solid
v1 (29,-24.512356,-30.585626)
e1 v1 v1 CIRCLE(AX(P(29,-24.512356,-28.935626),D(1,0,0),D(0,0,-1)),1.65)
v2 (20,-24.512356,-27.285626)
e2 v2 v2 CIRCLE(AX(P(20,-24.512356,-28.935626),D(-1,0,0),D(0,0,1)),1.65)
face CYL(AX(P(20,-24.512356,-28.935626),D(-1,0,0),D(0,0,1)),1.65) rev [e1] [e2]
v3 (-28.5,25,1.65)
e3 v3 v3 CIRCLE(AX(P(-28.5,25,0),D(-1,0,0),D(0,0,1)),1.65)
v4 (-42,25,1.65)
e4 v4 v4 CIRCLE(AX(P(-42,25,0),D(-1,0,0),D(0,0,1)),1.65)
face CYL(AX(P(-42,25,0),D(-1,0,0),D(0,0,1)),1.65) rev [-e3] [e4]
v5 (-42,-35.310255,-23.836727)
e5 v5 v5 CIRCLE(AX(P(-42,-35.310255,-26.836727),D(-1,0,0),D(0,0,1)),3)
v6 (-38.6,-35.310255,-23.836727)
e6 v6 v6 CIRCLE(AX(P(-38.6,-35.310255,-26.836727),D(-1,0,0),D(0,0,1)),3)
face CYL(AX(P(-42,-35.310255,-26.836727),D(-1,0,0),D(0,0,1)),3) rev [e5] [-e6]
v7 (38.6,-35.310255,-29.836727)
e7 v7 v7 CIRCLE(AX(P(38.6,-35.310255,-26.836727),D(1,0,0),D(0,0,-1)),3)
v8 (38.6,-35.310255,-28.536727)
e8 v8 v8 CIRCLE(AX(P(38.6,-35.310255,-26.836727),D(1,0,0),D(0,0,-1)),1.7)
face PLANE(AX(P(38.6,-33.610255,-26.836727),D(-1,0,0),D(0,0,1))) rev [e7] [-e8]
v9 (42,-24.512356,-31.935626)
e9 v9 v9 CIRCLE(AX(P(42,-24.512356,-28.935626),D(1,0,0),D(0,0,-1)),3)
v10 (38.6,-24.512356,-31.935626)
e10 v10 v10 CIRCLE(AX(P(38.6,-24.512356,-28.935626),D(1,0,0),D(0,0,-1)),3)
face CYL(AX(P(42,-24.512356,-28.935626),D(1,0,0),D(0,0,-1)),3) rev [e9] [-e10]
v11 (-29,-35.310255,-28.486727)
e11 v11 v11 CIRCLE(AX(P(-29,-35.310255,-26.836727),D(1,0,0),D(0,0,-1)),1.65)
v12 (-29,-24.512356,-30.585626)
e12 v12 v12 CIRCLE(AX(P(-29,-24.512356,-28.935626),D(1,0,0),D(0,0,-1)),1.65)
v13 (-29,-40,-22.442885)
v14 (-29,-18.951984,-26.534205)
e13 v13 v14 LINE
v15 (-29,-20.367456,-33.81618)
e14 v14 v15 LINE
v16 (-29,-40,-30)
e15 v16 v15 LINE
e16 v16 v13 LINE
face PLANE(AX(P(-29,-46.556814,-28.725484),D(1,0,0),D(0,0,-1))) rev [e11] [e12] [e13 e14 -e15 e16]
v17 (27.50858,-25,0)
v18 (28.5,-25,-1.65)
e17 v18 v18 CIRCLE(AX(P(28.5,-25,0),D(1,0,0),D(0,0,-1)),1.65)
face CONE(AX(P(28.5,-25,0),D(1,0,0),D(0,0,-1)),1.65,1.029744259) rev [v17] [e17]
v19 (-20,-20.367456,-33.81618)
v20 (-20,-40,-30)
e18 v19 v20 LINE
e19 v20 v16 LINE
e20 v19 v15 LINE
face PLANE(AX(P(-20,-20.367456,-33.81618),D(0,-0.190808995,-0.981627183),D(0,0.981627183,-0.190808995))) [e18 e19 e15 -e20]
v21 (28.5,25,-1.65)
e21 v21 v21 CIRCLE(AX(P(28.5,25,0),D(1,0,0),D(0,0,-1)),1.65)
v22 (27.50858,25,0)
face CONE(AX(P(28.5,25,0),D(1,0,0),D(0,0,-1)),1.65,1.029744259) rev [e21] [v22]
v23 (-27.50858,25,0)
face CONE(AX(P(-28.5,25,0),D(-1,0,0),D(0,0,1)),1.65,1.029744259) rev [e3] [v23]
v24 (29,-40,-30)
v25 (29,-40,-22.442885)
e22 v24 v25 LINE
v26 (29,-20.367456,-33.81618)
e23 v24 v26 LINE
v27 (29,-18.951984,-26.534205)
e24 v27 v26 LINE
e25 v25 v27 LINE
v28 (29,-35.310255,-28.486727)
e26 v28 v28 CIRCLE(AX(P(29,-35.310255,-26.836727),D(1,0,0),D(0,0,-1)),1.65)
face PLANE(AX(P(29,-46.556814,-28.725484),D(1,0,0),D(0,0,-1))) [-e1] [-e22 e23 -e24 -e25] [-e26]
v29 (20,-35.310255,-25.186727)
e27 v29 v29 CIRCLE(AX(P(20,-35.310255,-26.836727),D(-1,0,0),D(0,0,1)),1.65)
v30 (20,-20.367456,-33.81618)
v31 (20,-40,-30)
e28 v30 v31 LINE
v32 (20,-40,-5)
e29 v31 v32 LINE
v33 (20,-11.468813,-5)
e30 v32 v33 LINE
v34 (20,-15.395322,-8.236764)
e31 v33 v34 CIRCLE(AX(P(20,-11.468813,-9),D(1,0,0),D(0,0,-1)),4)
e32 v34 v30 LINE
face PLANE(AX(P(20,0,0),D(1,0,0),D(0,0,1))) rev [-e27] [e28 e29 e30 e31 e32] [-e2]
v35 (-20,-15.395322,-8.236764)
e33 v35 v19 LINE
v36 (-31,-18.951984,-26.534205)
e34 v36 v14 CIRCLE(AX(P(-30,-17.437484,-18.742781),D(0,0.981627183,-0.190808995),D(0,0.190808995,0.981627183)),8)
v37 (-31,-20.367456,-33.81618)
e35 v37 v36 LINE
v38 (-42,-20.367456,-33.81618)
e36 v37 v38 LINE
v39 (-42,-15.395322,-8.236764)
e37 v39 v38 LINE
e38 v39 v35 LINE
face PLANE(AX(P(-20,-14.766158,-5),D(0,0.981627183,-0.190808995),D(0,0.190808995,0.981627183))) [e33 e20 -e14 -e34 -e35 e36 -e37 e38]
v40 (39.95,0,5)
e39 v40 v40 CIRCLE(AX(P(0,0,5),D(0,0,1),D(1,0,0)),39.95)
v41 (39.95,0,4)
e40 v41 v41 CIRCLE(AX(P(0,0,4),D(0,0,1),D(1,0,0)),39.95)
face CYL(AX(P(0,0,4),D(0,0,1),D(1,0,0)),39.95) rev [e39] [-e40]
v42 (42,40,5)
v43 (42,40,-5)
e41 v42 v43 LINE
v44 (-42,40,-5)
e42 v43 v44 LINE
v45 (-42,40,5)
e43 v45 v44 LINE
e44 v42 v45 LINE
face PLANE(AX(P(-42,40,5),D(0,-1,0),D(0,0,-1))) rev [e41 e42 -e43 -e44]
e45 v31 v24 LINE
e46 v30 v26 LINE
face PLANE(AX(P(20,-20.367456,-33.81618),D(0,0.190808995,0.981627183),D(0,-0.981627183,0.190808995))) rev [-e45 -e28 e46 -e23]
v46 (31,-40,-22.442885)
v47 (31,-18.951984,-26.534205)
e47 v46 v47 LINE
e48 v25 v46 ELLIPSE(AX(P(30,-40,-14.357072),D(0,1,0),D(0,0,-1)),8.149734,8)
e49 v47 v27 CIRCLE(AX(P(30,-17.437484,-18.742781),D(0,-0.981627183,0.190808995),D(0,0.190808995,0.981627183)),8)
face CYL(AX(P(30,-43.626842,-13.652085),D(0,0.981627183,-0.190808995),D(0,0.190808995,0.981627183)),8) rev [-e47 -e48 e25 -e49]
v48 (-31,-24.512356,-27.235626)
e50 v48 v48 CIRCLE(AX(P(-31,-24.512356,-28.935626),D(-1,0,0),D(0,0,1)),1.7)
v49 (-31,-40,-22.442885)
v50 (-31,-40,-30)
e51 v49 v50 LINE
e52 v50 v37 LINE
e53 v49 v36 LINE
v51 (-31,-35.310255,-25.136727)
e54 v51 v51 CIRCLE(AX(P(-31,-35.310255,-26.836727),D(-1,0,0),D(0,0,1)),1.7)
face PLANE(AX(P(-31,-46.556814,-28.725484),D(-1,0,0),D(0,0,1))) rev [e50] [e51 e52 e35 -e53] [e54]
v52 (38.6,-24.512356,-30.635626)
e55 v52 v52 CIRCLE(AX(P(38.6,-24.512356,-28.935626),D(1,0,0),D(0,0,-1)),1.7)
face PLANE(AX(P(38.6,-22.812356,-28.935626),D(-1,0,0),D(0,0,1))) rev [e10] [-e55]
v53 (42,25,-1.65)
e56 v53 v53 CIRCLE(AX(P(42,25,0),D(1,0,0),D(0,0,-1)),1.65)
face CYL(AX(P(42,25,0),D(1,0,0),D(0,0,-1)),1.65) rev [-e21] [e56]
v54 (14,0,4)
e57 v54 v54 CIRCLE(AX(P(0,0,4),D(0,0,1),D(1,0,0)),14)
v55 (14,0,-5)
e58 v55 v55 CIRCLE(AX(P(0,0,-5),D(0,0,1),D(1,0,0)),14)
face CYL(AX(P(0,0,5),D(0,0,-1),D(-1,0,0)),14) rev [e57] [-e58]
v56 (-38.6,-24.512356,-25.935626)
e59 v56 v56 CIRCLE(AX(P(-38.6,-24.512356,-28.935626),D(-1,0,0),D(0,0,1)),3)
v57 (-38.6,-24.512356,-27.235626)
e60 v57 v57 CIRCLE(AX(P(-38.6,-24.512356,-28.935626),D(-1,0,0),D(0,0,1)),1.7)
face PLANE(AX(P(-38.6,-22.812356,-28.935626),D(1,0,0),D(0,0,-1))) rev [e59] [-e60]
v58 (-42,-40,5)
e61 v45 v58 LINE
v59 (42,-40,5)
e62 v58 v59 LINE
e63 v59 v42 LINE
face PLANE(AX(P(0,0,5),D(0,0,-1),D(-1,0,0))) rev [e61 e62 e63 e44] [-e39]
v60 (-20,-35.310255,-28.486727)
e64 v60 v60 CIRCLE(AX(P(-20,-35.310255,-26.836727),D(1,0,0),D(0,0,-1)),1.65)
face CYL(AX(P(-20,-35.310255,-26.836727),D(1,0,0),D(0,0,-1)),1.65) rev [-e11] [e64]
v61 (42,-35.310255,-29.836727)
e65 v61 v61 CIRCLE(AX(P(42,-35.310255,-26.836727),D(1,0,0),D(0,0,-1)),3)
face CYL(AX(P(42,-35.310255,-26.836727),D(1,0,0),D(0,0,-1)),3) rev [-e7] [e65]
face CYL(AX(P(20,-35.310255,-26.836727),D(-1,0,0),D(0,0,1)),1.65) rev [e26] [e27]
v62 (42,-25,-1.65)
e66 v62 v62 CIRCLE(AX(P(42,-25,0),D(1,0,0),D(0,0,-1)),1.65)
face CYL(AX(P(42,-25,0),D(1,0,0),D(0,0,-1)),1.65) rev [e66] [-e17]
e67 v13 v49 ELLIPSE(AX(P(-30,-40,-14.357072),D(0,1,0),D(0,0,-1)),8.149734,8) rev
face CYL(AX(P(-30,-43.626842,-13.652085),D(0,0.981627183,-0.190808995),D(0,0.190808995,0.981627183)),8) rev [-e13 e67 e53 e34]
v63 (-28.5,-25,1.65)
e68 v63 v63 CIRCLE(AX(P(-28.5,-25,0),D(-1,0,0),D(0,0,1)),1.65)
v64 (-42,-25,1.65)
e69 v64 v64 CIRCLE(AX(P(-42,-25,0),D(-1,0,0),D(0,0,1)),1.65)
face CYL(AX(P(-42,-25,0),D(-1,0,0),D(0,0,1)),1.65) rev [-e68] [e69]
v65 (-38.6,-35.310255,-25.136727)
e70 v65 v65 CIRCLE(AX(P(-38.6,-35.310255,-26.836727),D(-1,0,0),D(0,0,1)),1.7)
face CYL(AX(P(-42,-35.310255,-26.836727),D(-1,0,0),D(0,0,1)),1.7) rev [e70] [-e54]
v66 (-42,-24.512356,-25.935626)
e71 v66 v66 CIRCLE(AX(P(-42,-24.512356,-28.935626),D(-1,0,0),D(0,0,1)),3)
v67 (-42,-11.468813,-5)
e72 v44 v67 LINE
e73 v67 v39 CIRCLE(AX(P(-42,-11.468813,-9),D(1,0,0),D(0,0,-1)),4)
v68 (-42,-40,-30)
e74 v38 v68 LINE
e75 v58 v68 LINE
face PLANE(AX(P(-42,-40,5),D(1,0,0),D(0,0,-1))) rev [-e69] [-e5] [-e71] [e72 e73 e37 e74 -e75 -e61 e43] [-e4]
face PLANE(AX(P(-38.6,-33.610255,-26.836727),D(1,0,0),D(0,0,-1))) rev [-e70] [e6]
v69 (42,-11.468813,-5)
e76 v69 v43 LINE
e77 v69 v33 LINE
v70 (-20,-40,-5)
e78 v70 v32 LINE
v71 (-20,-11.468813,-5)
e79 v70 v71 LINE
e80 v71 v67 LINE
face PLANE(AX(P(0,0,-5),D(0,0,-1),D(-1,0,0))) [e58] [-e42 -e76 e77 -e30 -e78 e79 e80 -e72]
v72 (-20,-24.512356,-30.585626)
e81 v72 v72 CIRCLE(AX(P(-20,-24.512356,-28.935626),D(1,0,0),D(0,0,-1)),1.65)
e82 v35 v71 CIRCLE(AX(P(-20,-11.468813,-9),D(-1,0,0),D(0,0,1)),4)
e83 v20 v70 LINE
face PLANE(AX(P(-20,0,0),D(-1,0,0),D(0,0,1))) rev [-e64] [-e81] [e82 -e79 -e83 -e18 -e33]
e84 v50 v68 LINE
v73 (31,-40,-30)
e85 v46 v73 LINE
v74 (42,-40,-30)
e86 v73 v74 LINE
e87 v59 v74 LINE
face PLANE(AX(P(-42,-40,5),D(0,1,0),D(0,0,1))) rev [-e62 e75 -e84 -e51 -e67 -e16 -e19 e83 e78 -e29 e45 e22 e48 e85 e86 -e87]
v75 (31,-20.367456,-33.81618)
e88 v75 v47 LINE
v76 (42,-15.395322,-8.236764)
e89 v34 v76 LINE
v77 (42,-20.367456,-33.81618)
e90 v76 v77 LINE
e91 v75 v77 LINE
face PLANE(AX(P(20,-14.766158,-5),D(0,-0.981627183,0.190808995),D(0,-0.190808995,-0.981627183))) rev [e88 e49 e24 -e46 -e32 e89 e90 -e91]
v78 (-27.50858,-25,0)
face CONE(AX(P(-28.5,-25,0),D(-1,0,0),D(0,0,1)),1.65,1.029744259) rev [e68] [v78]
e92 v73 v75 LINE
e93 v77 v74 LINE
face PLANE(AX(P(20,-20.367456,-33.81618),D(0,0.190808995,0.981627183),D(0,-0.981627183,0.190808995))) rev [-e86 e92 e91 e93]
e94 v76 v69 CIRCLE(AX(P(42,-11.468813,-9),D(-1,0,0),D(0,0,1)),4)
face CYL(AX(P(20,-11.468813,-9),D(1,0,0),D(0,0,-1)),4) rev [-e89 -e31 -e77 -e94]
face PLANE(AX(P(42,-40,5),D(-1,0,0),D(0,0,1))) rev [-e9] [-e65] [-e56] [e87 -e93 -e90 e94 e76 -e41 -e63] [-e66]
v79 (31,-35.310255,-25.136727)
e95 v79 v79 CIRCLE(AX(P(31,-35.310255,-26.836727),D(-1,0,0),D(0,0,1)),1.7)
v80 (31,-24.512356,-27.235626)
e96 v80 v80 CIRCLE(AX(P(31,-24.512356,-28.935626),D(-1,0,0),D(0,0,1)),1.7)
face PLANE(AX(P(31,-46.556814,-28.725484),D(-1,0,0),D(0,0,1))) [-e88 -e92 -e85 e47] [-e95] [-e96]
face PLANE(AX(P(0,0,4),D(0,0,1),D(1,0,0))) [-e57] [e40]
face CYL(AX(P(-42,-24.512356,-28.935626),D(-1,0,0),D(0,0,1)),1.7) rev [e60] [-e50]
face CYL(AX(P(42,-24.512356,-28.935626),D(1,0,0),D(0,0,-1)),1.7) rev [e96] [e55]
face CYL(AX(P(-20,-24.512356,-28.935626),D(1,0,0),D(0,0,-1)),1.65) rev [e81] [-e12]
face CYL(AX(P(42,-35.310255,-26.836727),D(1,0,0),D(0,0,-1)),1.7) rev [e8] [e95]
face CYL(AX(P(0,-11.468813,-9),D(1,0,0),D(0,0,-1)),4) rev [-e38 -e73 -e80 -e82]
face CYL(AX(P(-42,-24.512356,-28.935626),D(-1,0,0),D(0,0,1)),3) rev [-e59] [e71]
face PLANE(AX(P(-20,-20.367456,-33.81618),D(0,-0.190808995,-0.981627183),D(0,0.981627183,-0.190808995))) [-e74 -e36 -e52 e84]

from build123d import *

# Parameters (mm, degrees)
SKETCH_1_W                  = 84
SKETCH_1_H                  = 80
SKETCH_1_R                  = 14
EXTRUDE_1_DEPTH             = 5
HOLE_WIZARD_M4_1_AT_2_COUNT = 2
HOLE_WIZARD_M4_1_AT_2_PITCH = 50
EXTRUDE_2_DEPTH             = 22
CUT_EXTRUDE_3_REACH         = 79
HOLE_START                  = -42
HOLE_WIZARD_2_OUTLINE_R     = 1.7
HOLE_WIZARD_2_DEPTH         = 11
HOLE_WIZARD_2_2_OUTLINE_R   = 3
HOLE_WIZARD_2_2_OUTLINE_R_2 = 1.7
HOLE_WIZARD_2_2_DEPTH       = 3.4
HOLE_WIZARD_M4_2_D          = 3.3
FILLET_1_R                  = 4
SKETCH_14_R                 = 39.95
CUT_EXTRUDE_6_DEPTH         = 1


# Read off the part's stored shape, not the designer's step: 打孔尺寸(%根据)内六角圆柱头螺钉的类型2
with BuildPart() as part:
    # 草图1 → 凸台-拉伸1 (new, symmetric)
    with BuildSketch(Plane.XY):
        Rectangle(SKETCH_1_W, SKETCH_1_H)
        Circle(SKETCH_1_R, mode=Mode.SUBTRACT)
    extrude(amount=EXTRUDE_1_DEPTH, both=True)

    # 草图4 → M4 螺纹孔1 (revolve, cut)
    with BuildSketch(Plane(origin=(-42, 25, 0), x_dir=(0, 0, 1), z_dir=(0, 1, 0))):
        Polygon((0, 0), (0, 14.491420021), (1.65, 13.5), (1.65, 0), align=None)
    hole_wizard_m4_1 = revolve(axis=Axis((-48.35, 25, 0), (1, 0, 0)), mode=Mode.SUBTRACT)

    # M4 螺纹孔1 at 2: M4 螺纹孔1 ×2
    with Locations(*[(0, -i * HOLE_WIZARD_M4_1_AT_2_PITCH, 0) for i in range(1, HOLE_WIZARD_M4_1_AT_2_COUNT)]):
        add(hole_wizard_m4_1, mode=Mode.SUBTRACT)

    # 草图6 → 凸台-拉伸2 (add)
    with BuildSketch(Plane.ZY.offset(42)):
        Polygon((-5, -14.766158372), (-5, -40), (-30, -40), (-33.816179908, -20.367456331), align=None)
    extrude_2 = extrude(amount=-EXTRUDE_2_DEPTH)

    # 切除-拉伸3: up to this plane
    cut_extrude_3_end = Plane(origin=(-42, -40, 5), z_dir=(0, 1, 0))
    # 草图7 → 切除-拉伸3 (cut, up to the surface)
    with BuildSketch(Plane(origin=(0, -13.292034521, 2.583709779), x_dir=(1, 0, 0), z_dir=(0, 0.9816271834476648, -0.19080899537654153)), mode=Mode.PRIVATE) as cut_extrude_3_sk1:
        with BuildLine():
            Line((-31, 37.081175318), (-29, 37.081175318))
            Line((-29, 37.081175318), (-29, 29.662905695))
            ThreePointArc((-29, 29.662905695), (-30, 13.725651762), (-31, 29.662905695))
            Line((-31, 29.662905695), (-31, 37.081175318))
        make_face()
    cut_extrude_3_tool1 = split(extrude(cut_extrude_3_sk1.sketch, amount=-CUT_EXTRUDE_3_REACH, mode=Mode.PRIVATE), bisect_by=cut_extrude_3_end, keep=Keep.BOTH, mode=Mode.PRIVATE)
    cut_extrude_3 = cut_extrude_3_tool1.solids().sort_by_distance((-30, -17.589666, -19.525688))[0]
    add(cut_extrude_3, mode=Mode.SUBTRACT)

    # 打孔尺寸(%根据)内六角圆柱头螺钉的类型2 outline → 打孔尺寸(%根据)内六角圆柱头螺钉的类型2 (cut)
    with BuildSketch(Plane.YZ.offset(HOLE_START)):
        with Locations((-35.310255285, -26.836727248)):
            Circle(HOLE_WIZARD_2_OUTLINE_R)
        with Locations((-24.512356267, -28.935626197)):
            Circle(HOLE_WIZARD_2_OUTLINE_R)
    hole_wizard_2 = extrude(amount=HOLE_WIZARD_2_DEPTH, mode=Mode.SUBTRACT)

    # Hole Wizard 2 2 outline → Hole Wizard 2 2 (cut)
    # profile 1 of 2: a face of its own
    with BuildSketch(Plane.YZ.offset(HOLE_START)):
        with Locations((-35.310255285, -26.836727248)):
            Circle(HOLE_WIZARD_2_2_OUTLINE_R)
        with Locations((-35.310255285, -26.836727248)):
            Circle(HOLE_WIZARD_2_2_OUTLINE_R_2, mode=Mode.SUBTRACT)
    # profile 2 of 2: a face of its own
    with BuildSketch(Plane.YZ.offset(HOLE_START)):
        with Locations((-24.512356267, -28.935626197)):
            Circle(HOLE_WIZARD_2_2_OUTLINE_R)
        with Locations((-24.512356267, -28.935626197)):
            Circle(HOLE_WIZARD_2_2_OUTLINE_R_2, mode=Mode.SUBTRACT)
    hole_wizard_2_2 = extrude(amount=HOLE_WIZARD_2_2_DEPTH, mode=Mode.SUBTRACT)

    # M4 螺纹孔2 (through all)
    with Locations(Plane(origin=(-20, 0, 0), x_dir=(0, 0, -1), z_dir=(1, 0, 0))):
        with Locations((28.935626197, -24.512356267), (26.836727248, -35.310255285)):
            hole_wizard_m4_2 = Hole(HOLE_WIZARD_M4_2_D / 2)

    # 镜向1: M4 螺纹孔1, 凸台-拉伸2, 切除-拉伸3, 打孔尺寸(%根据)内六角圆柱头螺钉的类型2, Hole Wizard 2 2, M4 螺纹孔2 across plane
    add(hole_wizard_m4_1.mirror(Plane(origin=(0, 0, 0), x_dir=(0, 0, 1), z_dir=(1, 0, 0))), mode=Mode.SUBTRACT)
    add(extrude_2.mirror(Plane(origin=(0, 0, 0), x_dir=(0, 0, 1), z_dir=(1, 0, 0))))
    add(cut_extrude_3.mirror(Plane(origin=(0, 0, 0), x_dir=(0, 0, 1), z_dir=(1, 0, 0))), mode=Mode.SUBTRACT)
    add(hole_wizard_2.mirror(Plane(origin=(0, 0, 0), x_dir=(0, 0, 1), z_dir=(1, 0, 0))), mode=Mode.SUBTRACT)
    add(hole_wizard_2_2.mirror(Plane(origin=(0, 0, 0), x_dir=(0, 0, 1), z_dir=(1, 0, 0))), mode=Mode.SUBTRACT)
    add(hole_wizard_m4_2.mirror(Plane(origin=(0, 0, 0), x_dir=(0, 0, 1), z_dir=(1, 0, 0))), mode=Mode.SUBTRACT)

    # 镜向1 copy 1 sketch → 镜向1 copy 1 (revolve, cut)
    with BuildSketch(Plane(origin=(42, -25, 0), x_dir=(0, 0, 1), z_dir=(0, 1, 0))):
        Polygon((0, 0), (0, -14.491420021), (1.65, -13.5), (1.65, 0), align=None)
    revolve(axis=Axis((48.35, -25, 0), (1, 0, 0)), mode=Mode.SUBTRACT)

    # 圆角1
    fillet_1_edges = [part.edges().sort_by_distance(p)[0] for p in [
        (-31, -14.766158372, -5),
        (31, -14.766158372, -5),
    ]]
    fillet(fillet_1_edges, radius=FILLET_1_R)

    # 草图14 → 切除-拉伸6 (cut)
    with BuildSketch(Plane.XY.offset(5)):
        Circle(SKETCH_14_R)
    extrude(amount=-CUT_EXTRUDE_6_DEPTH, mode=Mode.SUBTRACT)


solid = part.part
